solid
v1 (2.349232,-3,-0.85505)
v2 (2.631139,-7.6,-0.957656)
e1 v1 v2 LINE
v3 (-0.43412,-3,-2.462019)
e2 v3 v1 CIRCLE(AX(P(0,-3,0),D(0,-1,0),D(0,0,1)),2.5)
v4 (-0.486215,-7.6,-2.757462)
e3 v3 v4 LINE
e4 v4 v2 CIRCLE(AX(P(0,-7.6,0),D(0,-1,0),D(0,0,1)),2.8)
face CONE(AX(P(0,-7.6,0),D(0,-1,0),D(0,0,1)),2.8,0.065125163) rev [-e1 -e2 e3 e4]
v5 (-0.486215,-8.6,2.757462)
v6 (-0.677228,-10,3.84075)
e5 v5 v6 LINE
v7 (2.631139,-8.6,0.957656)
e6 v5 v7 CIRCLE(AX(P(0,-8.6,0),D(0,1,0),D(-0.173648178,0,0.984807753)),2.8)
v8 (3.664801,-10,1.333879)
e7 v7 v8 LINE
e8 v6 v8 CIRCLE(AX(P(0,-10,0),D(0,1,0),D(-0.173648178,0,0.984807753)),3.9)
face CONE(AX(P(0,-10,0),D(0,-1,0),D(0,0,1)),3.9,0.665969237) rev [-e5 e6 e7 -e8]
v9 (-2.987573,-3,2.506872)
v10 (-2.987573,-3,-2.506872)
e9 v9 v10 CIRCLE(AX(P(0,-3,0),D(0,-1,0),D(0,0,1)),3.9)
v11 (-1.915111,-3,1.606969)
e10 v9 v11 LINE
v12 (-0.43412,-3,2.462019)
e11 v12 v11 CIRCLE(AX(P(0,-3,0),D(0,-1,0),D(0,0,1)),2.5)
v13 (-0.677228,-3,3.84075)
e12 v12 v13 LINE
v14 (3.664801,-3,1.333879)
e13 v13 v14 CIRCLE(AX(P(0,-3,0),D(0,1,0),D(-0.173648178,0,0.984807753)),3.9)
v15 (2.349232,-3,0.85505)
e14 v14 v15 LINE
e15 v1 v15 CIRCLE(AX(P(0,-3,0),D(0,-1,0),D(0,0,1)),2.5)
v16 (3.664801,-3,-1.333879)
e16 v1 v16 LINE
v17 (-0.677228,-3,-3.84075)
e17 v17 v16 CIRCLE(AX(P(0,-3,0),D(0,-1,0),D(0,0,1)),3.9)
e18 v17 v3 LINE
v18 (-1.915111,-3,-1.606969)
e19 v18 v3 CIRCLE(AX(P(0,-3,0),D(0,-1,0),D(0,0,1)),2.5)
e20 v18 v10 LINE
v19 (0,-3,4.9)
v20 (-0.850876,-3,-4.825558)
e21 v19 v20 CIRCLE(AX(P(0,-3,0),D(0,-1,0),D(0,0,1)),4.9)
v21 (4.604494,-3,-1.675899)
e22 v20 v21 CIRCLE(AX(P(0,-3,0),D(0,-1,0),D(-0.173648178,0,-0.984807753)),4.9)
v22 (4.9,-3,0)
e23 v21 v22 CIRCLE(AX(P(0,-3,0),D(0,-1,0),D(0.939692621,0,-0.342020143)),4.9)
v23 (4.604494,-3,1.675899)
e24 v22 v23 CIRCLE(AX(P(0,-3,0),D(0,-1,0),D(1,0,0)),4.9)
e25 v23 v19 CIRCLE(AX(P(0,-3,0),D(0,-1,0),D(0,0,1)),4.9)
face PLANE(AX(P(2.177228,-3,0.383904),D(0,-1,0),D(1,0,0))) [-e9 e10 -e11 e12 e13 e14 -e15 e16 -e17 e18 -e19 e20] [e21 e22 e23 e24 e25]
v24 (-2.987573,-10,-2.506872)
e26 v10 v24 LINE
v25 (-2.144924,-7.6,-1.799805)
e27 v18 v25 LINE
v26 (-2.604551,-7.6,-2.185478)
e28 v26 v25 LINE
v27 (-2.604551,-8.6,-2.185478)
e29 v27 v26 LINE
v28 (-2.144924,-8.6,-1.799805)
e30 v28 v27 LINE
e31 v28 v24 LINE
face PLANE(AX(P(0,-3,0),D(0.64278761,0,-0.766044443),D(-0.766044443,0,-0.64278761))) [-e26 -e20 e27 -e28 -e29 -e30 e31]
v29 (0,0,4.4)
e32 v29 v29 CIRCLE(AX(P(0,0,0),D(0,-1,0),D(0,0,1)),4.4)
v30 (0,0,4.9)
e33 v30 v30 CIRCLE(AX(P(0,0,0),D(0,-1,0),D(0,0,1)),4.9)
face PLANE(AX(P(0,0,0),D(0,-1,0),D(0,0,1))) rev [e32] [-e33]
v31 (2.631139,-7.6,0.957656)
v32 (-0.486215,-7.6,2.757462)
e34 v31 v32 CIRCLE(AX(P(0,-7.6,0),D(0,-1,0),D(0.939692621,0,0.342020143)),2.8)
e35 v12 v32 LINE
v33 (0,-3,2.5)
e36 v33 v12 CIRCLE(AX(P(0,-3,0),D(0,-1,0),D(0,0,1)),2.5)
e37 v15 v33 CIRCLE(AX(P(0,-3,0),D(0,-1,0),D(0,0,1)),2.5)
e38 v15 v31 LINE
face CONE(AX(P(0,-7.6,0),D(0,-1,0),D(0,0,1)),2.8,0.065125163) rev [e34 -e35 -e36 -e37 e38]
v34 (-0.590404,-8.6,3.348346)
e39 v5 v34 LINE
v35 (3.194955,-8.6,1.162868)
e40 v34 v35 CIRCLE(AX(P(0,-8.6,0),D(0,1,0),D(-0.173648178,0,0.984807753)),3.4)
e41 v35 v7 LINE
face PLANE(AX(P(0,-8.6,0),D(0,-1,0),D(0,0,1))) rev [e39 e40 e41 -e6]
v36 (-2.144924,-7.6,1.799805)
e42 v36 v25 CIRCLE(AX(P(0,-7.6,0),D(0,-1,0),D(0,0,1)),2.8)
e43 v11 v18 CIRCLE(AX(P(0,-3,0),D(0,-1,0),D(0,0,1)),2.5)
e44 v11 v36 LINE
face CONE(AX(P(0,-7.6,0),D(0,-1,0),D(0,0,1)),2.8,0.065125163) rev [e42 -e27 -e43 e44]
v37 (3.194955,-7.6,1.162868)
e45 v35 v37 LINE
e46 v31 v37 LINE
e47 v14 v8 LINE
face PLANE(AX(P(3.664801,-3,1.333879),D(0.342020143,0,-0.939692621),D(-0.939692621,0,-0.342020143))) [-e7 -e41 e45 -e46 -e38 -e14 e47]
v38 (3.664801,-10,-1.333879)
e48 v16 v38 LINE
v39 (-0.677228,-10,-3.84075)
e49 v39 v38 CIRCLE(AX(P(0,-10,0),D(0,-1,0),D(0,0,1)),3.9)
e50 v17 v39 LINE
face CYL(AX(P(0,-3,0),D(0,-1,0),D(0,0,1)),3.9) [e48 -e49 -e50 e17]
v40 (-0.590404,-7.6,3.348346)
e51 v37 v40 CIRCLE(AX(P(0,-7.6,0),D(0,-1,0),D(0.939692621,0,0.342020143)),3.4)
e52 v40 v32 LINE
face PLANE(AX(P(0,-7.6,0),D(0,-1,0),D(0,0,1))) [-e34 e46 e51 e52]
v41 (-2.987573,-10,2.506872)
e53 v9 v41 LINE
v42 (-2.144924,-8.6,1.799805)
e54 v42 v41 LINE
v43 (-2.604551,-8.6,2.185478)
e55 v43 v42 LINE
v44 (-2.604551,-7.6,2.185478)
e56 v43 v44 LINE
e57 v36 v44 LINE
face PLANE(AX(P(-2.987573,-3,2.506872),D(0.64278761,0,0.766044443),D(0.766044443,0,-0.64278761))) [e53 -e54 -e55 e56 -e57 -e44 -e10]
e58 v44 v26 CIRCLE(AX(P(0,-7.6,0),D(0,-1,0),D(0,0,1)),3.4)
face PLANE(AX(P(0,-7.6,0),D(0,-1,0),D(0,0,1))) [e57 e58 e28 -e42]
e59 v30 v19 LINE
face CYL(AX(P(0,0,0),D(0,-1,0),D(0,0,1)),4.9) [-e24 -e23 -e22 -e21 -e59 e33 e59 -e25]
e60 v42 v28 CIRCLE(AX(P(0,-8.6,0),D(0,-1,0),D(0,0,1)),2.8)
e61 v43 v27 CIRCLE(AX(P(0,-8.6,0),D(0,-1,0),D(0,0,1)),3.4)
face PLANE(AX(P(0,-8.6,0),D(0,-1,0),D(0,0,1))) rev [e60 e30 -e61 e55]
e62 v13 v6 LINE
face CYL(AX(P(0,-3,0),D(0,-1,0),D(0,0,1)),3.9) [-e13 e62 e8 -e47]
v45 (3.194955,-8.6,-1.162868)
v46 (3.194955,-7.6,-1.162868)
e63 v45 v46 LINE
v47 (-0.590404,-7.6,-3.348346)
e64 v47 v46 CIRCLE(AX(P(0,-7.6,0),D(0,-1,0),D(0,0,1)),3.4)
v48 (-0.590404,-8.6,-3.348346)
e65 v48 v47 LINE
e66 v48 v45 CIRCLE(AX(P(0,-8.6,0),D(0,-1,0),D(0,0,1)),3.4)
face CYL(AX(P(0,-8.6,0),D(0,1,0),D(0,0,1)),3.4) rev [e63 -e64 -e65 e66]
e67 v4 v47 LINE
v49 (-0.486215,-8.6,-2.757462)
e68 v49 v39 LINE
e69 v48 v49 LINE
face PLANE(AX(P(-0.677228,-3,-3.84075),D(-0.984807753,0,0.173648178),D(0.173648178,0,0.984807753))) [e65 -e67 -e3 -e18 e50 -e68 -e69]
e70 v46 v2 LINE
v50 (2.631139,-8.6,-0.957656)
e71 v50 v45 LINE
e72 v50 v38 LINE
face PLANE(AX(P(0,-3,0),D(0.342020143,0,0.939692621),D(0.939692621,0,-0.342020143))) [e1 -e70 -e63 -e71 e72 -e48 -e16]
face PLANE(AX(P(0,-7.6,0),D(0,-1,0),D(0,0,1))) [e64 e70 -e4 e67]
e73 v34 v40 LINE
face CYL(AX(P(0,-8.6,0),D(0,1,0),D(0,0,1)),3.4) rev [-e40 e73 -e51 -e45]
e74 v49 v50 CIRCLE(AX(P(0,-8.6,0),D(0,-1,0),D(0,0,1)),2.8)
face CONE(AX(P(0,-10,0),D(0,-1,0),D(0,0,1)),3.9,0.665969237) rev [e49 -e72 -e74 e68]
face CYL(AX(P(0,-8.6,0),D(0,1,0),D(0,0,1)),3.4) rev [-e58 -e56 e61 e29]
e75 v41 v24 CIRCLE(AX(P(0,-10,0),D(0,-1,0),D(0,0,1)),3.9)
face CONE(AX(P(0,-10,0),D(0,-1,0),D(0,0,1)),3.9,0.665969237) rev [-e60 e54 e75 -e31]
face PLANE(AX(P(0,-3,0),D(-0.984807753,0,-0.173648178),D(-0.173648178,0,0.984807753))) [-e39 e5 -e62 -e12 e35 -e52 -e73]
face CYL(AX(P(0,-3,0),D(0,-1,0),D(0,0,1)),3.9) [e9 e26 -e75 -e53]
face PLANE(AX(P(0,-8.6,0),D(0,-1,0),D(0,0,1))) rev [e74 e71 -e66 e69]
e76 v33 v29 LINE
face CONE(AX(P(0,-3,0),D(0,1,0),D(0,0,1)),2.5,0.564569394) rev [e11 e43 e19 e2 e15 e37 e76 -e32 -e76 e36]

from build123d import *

# Parameters (mm, degrees)
F3_DEPTH = 10


with BuildPart() as f1:
    # F0 (on Right) → F1 (revolve)
    with BuildSketch(Plane.YZ):
        Polygon((-7.6, 2.8), (-3, 2.5), (0, 4.4), (0, 4.9), (-3, 4.9), (-3, 3.9), (-10, 3.9), (-8.6, 2.8), (-8.6, 3.4), (-7.6, 3.4), align=None)
    revolve(axis=Axis((0, -6.9740121253, 0), (0, -1, 0)))

    # F2 (on face) → F3 (cut)
    with BuildSketch(Plane.XZ.offset(3)):
        with BuildLine():
            Line((-2.9875733282, 2.5068716778), (0, 0))
            Line((0, 0), (-0.6772278929, 3.8407502367))
            ThreePointArc((-0.6772278929, 3.8407502367), (-1.95, 3.3774990748), (-2.9875733282, 2.5068716778))
        make_face()
        with BuildLine():
            Line((3.6648012211, 1.333878559), (0, 0))
            Line((0, 0), (3.9, 0))
            ThreePointArc((3.9, 0), (3.8407502367, 0.6772278929), (3.6648012211, 1.333878559))
        make_face()
        with BuildLine():
            Line((3.9, 0), (0, 0))
            Line((0, 0), (3.6648012211, -1.333878559))
            ThreePointArc((3.6648012211, -1.333878559), (3.8407502367, -0.6772278929), (3.9, 0))
        make_face()
        with BuildLine():
            Line((-0.6772278929, -3.8407502367), (0, 0))
            Line((0, 0), (-2.9875733282, -2.5068716778))
            ThreePointArc((-2.9875733282, -2.5068716778), (-1.95, -3.3774990748), (-0.6772278929, -3.8407502367))
        make_face()
        with BuildLine():
            Line((-0.8508760706, 4.8255579898), (-0.6772278929, 3.8407502367))
            ThreePointArc((-0.6772278929, 3.8407502367), (1.95, 3.3774990748), (3.6648012211, 1.333878559))
            Line((3.6648012211, 1.333878559), (4.6044938419, 1.6758987023))
            ThreePointArc((4.6044938419, 1.6758987023), (2.45, 4.2435244785), (-0.8508760706, 4.8255579898))
        make_face()
        with BuildLine():
            ThreePointArc((3.6648012211, 1.333878559), (3.8407502367, 0.6772278929), (3.9, 0))
            Line((3.9, 0), (4.9, 0))
            ThreePointArc((4.9, 0), (4.8255579898, 0.8508760706), (4.6044938419, 1.6758987023))
            Line((4.6044938419, 1.6758987023), (3.6648012211, 1.333878559))
        make_face()
        with BuildLine():
            Line((4.9, 0), (3.9, 0))
            ThreePointArc((3.9, 0), (3.8407502367, -0.6772278929), (3.6648012211, -1.333878559))
            Line((3.6648012211, -1.333878559), (4.6044938419, -1.6758987023))
            ThreePointArc((4.6044938419, -1.6758987023), (4.8255579898, -0.8508760706), (4.9, 0))
        make_face()
        with BuildLine():
            ThreePointArc((3.6648012211, -1.333878559), (1.95, -3.3774990748), (-0.6772278929, -3.8407502367))
            Line((-0.6772278929, -3.8407502367), (-0.8508760706, -4.8255579898))
            ThreePointArc((-0.8508760706, -4.8255579898), (2.45, -4.2435244785), (4.6044938419, -1.6758987023))
            Line((4.6044938419, -1.6758987023), (3.6648012211, -1.333878559))
        make_face()
    extrude(amount=F3_DEPTH, mode=Mode.SUBTRACT)


solid = f1.part
